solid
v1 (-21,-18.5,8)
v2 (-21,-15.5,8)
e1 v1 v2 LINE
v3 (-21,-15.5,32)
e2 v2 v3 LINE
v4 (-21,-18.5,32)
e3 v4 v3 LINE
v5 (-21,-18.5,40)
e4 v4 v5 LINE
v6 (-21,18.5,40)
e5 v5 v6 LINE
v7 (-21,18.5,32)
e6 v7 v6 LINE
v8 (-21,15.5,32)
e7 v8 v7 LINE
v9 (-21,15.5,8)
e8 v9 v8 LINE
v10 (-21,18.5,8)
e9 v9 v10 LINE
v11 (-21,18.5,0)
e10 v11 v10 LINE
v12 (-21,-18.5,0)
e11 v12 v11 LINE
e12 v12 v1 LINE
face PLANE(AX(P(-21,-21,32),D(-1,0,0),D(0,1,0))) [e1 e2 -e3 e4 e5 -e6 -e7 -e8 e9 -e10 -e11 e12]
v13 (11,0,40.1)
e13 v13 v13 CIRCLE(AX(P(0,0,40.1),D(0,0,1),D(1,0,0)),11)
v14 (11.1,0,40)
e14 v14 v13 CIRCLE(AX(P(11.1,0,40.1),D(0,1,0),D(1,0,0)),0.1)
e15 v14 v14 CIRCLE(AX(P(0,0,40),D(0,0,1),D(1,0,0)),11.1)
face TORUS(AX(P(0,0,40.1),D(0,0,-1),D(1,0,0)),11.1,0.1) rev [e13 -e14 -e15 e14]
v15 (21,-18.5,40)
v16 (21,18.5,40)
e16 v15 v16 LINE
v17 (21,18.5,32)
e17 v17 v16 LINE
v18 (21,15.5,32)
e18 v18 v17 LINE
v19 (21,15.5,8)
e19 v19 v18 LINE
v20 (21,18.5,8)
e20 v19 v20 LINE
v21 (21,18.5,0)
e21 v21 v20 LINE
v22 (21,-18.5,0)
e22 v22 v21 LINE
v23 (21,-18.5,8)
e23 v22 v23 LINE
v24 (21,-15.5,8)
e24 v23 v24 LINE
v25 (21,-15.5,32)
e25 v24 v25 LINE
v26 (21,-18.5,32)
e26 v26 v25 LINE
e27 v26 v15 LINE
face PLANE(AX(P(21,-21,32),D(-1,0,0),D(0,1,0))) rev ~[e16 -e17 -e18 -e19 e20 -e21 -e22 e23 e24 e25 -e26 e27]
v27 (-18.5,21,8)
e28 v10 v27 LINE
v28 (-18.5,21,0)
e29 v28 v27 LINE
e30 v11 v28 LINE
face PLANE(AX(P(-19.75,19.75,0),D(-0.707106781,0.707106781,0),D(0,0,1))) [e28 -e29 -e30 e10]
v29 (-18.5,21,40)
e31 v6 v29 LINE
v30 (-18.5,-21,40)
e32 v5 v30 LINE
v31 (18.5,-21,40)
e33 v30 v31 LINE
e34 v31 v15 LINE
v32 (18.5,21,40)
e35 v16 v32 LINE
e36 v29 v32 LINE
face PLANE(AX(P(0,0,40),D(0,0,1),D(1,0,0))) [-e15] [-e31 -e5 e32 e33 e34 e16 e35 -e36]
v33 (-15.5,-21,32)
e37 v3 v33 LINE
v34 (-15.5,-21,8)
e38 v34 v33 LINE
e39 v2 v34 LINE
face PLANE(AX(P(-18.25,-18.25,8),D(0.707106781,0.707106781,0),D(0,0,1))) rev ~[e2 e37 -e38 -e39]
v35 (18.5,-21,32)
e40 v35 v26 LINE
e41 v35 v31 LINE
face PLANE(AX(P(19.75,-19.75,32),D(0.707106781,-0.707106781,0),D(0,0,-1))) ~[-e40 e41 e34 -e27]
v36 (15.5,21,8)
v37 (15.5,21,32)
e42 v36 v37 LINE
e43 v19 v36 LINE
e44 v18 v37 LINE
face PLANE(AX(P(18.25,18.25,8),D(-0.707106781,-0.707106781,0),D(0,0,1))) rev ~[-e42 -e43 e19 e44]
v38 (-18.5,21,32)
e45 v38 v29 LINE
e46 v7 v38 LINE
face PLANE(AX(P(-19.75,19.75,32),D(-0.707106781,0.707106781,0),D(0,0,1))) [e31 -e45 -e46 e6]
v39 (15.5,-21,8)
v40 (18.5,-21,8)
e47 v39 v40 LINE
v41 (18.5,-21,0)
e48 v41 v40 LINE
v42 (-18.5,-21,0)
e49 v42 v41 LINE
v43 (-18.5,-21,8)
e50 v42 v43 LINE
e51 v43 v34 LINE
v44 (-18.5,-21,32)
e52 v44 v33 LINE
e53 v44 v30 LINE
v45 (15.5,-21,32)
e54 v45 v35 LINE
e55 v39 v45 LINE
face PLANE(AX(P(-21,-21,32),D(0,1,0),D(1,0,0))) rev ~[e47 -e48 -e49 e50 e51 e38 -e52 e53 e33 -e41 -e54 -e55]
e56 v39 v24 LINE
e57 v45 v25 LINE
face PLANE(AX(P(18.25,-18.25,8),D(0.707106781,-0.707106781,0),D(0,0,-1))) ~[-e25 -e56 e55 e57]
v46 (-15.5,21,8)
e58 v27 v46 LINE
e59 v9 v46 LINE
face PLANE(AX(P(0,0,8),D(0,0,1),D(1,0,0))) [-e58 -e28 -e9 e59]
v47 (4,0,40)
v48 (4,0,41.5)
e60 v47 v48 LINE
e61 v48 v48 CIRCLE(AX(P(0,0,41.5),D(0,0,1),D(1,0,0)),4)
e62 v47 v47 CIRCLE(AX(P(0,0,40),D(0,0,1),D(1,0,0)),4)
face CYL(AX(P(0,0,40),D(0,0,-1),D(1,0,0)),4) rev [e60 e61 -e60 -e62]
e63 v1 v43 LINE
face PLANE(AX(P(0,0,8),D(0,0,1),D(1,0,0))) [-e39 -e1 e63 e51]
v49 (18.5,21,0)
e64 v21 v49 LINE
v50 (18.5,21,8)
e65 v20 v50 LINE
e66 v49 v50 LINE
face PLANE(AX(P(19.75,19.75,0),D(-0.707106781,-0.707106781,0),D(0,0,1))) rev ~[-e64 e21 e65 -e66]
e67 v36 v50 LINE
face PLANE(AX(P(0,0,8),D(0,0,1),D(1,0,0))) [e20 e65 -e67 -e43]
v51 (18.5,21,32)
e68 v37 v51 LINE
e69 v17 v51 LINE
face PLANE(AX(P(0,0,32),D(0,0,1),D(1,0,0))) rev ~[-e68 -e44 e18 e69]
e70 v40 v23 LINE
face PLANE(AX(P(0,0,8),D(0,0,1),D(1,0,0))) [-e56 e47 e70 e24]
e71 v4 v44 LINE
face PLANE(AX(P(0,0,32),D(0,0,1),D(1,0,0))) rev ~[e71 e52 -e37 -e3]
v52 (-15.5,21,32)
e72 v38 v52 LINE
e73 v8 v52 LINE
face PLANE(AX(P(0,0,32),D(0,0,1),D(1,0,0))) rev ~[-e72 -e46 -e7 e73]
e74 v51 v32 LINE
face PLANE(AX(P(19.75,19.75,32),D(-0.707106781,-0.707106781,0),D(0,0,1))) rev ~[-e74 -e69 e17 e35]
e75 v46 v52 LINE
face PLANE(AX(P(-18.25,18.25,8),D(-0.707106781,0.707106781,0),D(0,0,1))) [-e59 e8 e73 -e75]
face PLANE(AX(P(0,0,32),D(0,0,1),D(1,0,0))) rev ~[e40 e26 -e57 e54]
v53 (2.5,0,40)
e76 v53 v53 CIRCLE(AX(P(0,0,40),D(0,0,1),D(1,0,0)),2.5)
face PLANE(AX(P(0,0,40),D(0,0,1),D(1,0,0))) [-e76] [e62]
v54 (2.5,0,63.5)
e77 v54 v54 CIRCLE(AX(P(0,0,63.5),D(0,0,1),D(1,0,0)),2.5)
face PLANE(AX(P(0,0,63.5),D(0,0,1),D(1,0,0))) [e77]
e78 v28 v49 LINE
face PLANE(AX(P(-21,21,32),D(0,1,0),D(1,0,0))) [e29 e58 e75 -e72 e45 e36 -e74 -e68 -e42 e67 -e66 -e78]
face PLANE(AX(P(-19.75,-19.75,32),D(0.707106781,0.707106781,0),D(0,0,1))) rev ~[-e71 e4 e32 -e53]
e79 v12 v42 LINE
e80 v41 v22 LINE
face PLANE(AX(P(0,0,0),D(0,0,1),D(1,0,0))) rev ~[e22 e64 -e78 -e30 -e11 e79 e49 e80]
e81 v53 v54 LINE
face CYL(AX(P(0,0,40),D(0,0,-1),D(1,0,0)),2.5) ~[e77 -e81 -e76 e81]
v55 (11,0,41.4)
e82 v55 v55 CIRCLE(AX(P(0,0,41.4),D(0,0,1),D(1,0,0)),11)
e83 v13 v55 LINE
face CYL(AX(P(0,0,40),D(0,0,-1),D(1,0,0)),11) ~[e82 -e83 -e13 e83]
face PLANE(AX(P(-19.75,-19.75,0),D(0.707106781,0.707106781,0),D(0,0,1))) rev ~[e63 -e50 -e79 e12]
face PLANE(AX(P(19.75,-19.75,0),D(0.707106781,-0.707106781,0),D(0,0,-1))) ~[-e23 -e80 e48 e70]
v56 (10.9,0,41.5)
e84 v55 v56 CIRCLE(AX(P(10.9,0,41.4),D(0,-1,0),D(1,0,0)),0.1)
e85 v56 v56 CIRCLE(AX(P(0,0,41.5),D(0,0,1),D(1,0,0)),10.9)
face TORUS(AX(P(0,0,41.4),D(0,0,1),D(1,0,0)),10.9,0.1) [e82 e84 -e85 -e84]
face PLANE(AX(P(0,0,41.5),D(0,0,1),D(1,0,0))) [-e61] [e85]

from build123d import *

# Parameters (mm, degrees)
F0_W      = 42
F0_H      = 42
F1_DEPTH  = 8
F2_DEPTH  = 24
F3_DEPTH  = 8
F4_SIZE   = 2.5
F4_2_SIZE = 2.5
F5_SIZE   = 5.5
F7_R      = 11
F7_R_2    = 4
F8_DEPTH  = 1.5
F9_R      = 2.5
F10_DEPTH = 23.5
F12_R     = 0.1


# Not quite as in the source:
# - a feature names something its author has since deleted; it is built from what else it names


with BuildPart() as f1:
    # F0 (on Top) → F1 (new body)
    with BuildSketch(Plane.XY):
        Rectangle(F0_W, F0_H)
    extrude(amount=F1_DEPTH)


with BuildPart() as f2:
    # F2 (new): a face of the model
    f2_faces = [f1.part.faces().sort_by_distance(p)[0] for p in [
        (0, 0, 8),
    ]]
    extrude(f2_faces, amount=F2_DEPTH)


with BuildPart() as f3:
    # F3 (new): a face of the model
    f3_faces = [f2.part.faces().sort_by_distance(p)[0] for p in [
        (0, 0, 32),
    ]]
    extrude(f3_faces, amount=F3_DEPTH)

    # F4#2
    f4_2_edges = [f3.edges().sort_by_distance(p)[0] for p in [
        (-21, -21, 36),
        (-21, 21, 36),
        (21, 21, 36),
        (21, -21, 36),
    ]]
    chamfer(f4_2_edges, length=F4_2_SIZE)

    # F7 (on face) → F8 (join)
    with BuildSketch(Plane.XY.offset(40)):
        Circle(F7_R)
        Circle(F7_R_2, mode=Mode.SUBTRACT)
    extrude(amount=F8_DEPTH)

    # F9 (on face) → F10 (join)
    with BuildSketch(Plane.XY.offset(40)):
        Circle(F9_R)
    extrude(amount=F10_DEPTH)


with BuildPart() as f1_1:
    add(f1.part)

    # F4
    f4_edges = [f1_1.edges().sort_by_distance(p)[0] for p in [
        (-21, -21, 4),
        (-21, 21, 4),
        (21, 21, 4),
        (21, -21, 4),
    ]]
    chamfer(f4_edges, length=F4_SIZE)


with BuildPart() as f2_1:
    add(f2.part)

    # F5
    f5_edges = [f2_1.edges().sort_by_distance(p)[0] for p in [
        (21, -21, 20),
        (-21, -21, 20),
        (-21, 21, 20),
        (21, 21, 20),
    ]]
    chamfer(f5_edges, length=F5_SIZE)


with BuildPart() as f1_2:
    add(f1_1.part)

    # F11: union F2, F3
    add(f2_1.part)
    add(f3.part)

    # F12
    f12_edges = [f1_2.edges().sort_by_distance(p)[0] for p in [
        (11, 0, 40.75),
        (-11, 0, 40),
        (-11, 0, 41.5),
    ]]
    fillet(f12_edges, radius=F12_R)


solid = f1_2.part
